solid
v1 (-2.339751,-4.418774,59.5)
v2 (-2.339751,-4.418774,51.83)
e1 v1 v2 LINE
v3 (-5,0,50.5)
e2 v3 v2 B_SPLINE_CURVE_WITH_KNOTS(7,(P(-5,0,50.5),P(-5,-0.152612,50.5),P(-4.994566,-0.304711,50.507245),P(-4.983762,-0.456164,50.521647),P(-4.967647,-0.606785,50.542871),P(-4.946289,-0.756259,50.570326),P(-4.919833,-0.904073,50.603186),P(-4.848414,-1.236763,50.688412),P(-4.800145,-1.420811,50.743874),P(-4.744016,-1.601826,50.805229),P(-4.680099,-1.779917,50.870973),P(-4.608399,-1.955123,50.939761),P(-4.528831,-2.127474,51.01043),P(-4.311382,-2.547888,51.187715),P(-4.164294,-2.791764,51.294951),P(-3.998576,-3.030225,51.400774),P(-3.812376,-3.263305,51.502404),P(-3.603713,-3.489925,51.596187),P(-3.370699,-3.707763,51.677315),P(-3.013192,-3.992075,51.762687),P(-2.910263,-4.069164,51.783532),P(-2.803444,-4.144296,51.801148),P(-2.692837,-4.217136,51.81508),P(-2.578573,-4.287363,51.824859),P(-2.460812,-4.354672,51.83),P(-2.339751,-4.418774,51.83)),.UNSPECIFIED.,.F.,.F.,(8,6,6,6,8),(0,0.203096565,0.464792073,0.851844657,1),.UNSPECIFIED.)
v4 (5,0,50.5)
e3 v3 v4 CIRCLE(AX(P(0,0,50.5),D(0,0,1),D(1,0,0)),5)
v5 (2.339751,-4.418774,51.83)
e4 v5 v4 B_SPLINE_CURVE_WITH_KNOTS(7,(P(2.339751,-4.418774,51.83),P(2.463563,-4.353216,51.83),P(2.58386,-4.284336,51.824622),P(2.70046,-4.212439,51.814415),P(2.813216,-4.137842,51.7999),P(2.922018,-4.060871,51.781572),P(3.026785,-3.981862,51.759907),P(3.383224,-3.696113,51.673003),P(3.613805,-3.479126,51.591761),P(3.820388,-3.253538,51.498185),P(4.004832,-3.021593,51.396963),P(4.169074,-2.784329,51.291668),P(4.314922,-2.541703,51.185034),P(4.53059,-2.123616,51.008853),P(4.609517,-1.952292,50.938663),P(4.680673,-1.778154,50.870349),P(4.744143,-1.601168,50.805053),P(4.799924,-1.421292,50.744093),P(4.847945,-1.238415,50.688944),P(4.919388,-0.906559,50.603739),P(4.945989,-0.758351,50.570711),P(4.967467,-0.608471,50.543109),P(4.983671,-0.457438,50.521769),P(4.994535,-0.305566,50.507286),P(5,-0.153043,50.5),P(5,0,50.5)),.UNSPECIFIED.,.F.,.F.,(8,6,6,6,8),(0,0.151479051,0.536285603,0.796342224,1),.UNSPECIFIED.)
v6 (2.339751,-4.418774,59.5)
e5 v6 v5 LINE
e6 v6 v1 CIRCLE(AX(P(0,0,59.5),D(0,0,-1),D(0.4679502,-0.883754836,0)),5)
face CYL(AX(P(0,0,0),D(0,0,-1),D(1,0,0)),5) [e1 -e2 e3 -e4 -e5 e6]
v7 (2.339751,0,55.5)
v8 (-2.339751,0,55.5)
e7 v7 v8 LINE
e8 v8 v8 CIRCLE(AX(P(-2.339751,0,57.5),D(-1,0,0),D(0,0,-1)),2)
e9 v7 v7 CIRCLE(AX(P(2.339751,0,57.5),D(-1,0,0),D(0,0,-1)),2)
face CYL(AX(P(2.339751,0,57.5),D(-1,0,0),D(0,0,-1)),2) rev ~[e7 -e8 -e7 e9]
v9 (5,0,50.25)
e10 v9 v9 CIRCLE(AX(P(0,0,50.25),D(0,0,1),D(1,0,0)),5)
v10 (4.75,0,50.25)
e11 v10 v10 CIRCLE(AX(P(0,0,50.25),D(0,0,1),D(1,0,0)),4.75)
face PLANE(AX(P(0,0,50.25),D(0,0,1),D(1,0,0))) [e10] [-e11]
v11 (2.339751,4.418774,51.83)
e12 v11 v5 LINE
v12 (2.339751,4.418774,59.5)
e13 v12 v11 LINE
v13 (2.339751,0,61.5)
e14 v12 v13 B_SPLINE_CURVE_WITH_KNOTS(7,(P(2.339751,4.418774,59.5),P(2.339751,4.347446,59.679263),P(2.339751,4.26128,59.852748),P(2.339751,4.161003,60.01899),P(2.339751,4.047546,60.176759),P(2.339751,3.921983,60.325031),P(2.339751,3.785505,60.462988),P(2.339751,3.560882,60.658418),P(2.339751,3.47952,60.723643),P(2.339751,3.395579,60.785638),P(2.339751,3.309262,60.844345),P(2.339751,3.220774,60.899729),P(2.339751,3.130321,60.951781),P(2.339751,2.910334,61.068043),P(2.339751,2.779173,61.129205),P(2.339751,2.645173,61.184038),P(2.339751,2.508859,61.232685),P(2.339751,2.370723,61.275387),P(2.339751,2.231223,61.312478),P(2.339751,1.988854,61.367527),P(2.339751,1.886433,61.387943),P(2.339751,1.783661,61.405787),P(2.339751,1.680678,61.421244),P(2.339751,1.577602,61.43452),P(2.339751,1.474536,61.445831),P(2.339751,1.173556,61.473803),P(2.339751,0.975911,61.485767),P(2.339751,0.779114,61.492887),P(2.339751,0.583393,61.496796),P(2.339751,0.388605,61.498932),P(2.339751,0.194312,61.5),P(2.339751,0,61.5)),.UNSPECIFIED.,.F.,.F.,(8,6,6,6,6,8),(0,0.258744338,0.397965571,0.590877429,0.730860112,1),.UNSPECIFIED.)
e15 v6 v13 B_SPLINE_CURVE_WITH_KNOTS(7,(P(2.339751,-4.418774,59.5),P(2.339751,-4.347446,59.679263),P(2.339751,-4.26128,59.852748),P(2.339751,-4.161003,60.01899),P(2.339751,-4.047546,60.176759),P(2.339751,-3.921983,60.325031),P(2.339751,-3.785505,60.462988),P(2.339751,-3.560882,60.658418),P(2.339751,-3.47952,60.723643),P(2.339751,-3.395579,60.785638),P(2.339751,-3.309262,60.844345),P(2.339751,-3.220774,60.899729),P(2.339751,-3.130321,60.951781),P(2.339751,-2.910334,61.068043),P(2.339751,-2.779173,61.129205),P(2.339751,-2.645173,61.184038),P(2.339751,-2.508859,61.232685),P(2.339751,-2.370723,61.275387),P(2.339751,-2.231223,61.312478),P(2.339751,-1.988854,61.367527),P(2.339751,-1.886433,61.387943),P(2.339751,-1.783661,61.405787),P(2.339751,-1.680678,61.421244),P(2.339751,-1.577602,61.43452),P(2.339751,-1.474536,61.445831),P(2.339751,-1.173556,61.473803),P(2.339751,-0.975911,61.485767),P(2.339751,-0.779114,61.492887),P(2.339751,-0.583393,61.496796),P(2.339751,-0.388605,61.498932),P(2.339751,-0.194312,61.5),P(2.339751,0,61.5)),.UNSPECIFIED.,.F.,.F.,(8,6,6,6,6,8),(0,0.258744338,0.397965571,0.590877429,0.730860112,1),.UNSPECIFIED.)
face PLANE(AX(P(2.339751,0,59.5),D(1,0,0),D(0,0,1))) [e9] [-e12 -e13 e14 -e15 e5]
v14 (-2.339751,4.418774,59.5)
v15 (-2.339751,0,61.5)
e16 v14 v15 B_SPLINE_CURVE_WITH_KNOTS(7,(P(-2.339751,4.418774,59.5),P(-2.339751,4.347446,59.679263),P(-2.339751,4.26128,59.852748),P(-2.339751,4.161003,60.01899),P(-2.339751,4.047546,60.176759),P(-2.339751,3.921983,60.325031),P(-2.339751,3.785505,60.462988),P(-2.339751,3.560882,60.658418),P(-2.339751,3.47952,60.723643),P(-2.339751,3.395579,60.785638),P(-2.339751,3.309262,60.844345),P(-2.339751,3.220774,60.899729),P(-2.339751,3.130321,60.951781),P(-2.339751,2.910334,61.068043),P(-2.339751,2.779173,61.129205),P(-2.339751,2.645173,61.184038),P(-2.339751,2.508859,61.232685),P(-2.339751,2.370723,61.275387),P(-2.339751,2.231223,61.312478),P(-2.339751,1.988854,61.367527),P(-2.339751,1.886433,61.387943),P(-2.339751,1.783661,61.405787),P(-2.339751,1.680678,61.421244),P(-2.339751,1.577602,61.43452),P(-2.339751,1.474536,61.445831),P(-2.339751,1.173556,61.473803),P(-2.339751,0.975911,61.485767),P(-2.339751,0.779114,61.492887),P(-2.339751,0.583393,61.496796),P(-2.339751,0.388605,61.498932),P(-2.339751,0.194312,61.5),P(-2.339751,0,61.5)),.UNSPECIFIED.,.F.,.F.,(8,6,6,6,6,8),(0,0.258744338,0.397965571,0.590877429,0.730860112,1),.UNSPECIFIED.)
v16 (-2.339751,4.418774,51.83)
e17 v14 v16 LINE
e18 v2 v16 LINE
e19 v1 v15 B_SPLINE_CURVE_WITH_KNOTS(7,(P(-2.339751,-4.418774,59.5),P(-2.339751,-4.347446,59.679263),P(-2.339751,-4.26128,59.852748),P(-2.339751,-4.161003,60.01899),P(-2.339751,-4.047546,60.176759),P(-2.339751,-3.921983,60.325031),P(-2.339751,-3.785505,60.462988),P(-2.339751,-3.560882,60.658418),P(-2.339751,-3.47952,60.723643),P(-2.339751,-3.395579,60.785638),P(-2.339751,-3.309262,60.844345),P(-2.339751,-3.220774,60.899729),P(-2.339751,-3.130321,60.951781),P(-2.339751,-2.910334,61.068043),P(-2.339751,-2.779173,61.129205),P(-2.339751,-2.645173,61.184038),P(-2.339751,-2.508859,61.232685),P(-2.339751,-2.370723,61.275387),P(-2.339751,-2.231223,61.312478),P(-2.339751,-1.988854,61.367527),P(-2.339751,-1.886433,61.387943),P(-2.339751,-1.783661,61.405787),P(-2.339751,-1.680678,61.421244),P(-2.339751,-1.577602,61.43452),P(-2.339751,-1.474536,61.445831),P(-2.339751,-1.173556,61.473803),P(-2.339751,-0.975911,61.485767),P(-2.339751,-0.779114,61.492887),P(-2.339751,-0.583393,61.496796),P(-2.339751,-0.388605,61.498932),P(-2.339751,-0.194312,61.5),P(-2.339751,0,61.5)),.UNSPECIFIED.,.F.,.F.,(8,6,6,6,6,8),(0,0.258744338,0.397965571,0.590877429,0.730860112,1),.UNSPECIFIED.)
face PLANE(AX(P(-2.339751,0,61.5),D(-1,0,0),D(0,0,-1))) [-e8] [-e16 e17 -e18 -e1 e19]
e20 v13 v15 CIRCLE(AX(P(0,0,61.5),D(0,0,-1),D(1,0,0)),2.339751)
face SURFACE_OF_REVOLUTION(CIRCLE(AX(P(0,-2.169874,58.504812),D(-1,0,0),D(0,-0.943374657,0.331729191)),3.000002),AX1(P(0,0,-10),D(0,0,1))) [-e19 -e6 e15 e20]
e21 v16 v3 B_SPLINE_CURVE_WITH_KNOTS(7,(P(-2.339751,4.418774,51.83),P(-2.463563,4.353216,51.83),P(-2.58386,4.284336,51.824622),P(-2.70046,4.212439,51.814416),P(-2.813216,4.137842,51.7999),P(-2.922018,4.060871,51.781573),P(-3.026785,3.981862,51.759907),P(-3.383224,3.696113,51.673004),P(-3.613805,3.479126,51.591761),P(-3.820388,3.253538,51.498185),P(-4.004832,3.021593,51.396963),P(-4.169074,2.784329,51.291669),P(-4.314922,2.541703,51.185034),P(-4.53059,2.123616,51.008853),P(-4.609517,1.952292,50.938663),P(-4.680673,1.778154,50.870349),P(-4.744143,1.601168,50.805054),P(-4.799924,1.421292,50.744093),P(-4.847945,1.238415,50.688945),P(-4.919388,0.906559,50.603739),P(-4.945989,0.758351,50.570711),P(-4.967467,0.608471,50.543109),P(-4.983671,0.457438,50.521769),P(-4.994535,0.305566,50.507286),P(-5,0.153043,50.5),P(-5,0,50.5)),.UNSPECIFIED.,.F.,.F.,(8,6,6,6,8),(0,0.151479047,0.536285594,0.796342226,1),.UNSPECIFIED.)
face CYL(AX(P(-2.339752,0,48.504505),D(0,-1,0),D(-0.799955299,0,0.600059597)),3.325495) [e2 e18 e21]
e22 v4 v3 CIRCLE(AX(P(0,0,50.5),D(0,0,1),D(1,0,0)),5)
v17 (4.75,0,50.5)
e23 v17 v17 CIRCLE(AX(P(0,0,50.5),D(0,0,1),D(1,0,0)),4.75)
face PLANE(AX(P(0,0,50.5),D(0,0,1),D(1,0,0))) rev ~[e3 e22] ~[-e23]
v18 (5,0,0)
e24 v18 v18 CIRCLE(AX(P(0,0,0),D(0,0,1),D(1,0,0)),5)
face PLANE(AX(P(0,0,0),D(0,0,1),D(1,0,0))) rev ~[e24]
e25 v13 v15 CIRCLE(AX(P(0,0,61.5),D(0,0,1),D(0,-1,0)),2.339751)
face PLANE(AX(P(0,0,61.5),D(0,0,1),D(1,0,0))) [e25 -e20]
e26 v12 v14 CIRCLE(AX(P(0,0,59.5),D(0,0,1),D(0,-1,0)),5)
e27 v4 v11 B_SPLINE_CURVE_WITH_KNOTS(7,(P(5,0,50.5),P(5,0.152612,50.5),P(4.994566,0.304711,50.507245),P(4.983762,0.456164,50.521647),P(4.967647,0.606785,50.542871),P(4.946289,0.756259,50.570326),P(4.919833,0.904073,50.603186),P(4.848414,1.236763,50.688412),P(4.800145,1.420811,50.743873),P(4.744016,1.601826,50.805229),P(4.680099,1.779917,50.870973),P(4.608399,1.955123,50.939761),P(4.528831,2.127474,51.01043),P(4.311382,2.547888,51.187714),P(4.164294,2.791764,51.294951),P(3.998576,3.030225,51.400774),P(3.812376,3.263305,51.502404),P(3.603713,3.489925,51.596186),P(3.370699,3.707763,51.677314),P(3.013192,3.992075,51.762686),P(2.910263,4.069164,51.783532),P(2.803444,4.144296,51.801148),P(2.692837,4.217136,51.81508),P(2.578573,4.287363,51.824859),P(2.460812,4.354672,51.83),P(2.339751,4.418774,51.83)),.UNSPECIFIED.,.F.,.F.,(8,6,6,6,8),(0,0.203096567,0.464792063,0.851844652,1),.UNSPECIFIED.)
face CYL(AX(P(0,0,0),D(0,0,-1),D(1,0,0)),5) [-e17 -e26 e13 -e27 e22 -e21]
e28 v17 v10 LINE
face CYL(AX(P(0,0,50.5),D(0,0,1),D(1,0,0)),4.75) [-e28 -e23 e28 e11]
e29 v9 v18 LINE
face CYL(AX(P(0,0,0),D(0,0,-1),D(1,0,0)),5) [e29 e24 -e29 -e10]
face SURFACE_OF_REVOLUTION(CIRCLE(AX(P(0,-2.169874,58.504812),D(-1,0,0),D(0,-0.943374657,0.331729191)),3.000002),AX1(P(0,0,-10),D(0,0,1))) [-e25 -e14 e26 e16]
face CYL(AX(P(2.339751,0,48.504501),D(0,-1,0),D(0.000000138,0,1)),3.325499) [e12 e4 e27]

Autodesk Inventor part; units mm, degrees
ref_plane "YZ Plane" through (0, 0, 0) normal (1, 0, 0) x (0, 1, 0)
ref_plane "XZ Plane" through (0, 0, 0) normal (0, 1, 0) x (-1, 0, 0)
sketch "Rod" plane through (0, 0, 0) normal (0, 0, 1) x (1, 0, 0)
  circle A0 centre (0, 0) radius 5
  dimension "d0" = 10
extrude "RodFeature" add sketch "Rod" along normal blind 50.5
ref_plane "RodEndPlane" through (0, 0, 50.5) normal (0, 0, 1) x (1, 0, 0)
sketch "RodEnd" plane through (0, 0, 50.5) normal (0, 0, 1) x (1, 0, 0)
  circle A0 centre (0, 0) radius 5 projected
extrude "RodEndFeature" add sketch "RodEnd" along normal blind 11
sketch "RodEndTip" plane through (0, 0, 0) normal (1, 0, 0) x (0, 1, 0)
  line L0 (5, 0) -> (5, 61.5)
  line L1 (5, 61.5) -> (-5, 61.5)
  line L2 (-5, 0) -> (-5, 61.5)
  arc A0 (5, 59.5) -> (2, 61.5) centre (2.169876, 58.504813) ccw
  line L3 (0, -12.300193) -> (0, 73.801157) construction
  arc A1 (-2, 61.5) -> (-5, 59.5) centre (-2.169876, 58.504813) ccw
  point P0 (0, 0)
  point P1 (-5, 59.5)
  point P2 (-2.339751, 61.5)
  point P3 (2.339751, 61.5)
  dimension "d6" = 3
  dimension "d7" = 2
  dimension "d8" = 3
sketch "RodEndTip outline for RodEndTipFeature" plane through (0, 0, 0) normal (1, 0, 0) x (0, 1, 0)
  arc A0 (-5, 59.5) -> (-2.339751, 61.5) centre (-2.169876, 58.504813) cw
  line L0 (-5, 61.5) -> (-5, 59.5)
  line L1 (-2.339751, 61.5) -> (-5, 61.5)
  arc A1 (2.339751, 61.5) -> (5, 59.5) centre (2.169876, 58.504813) cw
  line L2 (5, 61.5) -> (2.339751, 61.5)
  line L3 (5, 59.5) -> (5, 61.5)
revolve "RodEndTipFeature" cut sketch "RodEndTip outline for RodEndTipFeature" angle 360 about axis through (0, 0, -10) along (0, 0, 1)
sketch "RodEndProfile" plane through (0, 0, 0) normal (0, 1, 0) x (-1, 0, 0)
  line L0 (2.339751, 61.5) -> (-2.339751, 61.5)
  line L1 (-5, 59.5) -> (5, 59.5)
  line L2 (-5, 59.5) -> (5, 59.5)
  line L3 (5, 0) -> (-5, 0)
  line L4 (-2.339751, 61.5) -> (2.339751, 61.5)
  line L5 (2.339751, 61.5) -> (2.339751, 50.5)
  line L6 (2.339751, 50.5) -> (-2.339751, 50.5)
  line L7 (-2.339751, 50.5) -> (-2.339751, 61.5)
  line L8 (-7.423886, 50.5) -> (7.423886, 50.5)
  arc A0 (-2.339751, 61.5) -> (-5, 59.5) centre (-2.169876, 58.504813) ccw
  arc A1 (5, 59.5) -> (2.339751, 61.5) centre (2.169876, 58.504813) ccw
  line L9 (5, 0) -> (5, 59.5)
  line L10 (-5, 0) -> (-5, 59.5)
  arc A2 (5, 50.5) -> (2.339751, 51.83) centre (2.339751, 48.504503) ccw
  line L11 (0, -12.280546) -> (0, 73.683275)
  arc A3 (-2.339751, 51.83) -> (-5, 50.5) centre (-2.339751, 48.504503) ccw
  line L12 (2.339751, 51.83) -> (-2.339751, 51.83) construction
  point P0 (0, 0)
  point P1 (5, 50)
  point P2 (-2.339751, 51.83)
  dimension "d10" = 4.6795
  dimension "d13" = 1.33
extrude "RodEndProfileFeature" cut sketch "RodEndProfile" along normal through all both and the other way through all contours A1 L1 L5 | L1 L9 A2 L5 | L7 L1 A0 | L7 A3 L10 L1
sketch "RodEndEtch" plane through (0, 0, 50.5) normal (0, 0, 1) x (1, 0, 0)
  circle A0 centre (0, 0) radius 5 projected
  circle A1 centre (0, 0) radius 4.75
  dimension "d14" = 0.25
extrude "RodEndEtchFeature" cut sketch "RodEndEtch" against normal blind 0.25
sketch "RodEndHole" plane through (2.339751, -4.418774, 51.83) normal (1, 0, 0) x (0, 0, -1)
  line L0 (64.130968, 4.418774) -> (-21.975807, 4.418774) construction
  line L1 (-3.67, 6.418774) -> (-7.67, 6.418774)
  line L2 (-7.67, 6.418774) -> (-7.67, 2.418774)
  line L3 (-7.67, 2.418774) -> (-3.67, 2.418774)
  line L4 (-3.67, 2.418774) -> (-3.67, 6.418774)
  line L5 (-3.67, 6.418774) -> (-7.67, 2.418774) construction
  line L6 (-7.67, 6.418774) -> (-3.67, 2.418774) construction
  line L7 (-9.67, 4.418774) -> (-9.67, 2.079023)
  point P0 (51.83, 4.418774)
  point P1 (-5.67, 4.418774)
  dimension "d17" = 2
  dimension "d18" = 4
hole "RodEndHoleFeature" at (2.339751, 0, 57.5) direction (-1, 0, 0) diameter 4 end through all
properties part number "1610-50H-2KG-12V-B07-Shaft"
